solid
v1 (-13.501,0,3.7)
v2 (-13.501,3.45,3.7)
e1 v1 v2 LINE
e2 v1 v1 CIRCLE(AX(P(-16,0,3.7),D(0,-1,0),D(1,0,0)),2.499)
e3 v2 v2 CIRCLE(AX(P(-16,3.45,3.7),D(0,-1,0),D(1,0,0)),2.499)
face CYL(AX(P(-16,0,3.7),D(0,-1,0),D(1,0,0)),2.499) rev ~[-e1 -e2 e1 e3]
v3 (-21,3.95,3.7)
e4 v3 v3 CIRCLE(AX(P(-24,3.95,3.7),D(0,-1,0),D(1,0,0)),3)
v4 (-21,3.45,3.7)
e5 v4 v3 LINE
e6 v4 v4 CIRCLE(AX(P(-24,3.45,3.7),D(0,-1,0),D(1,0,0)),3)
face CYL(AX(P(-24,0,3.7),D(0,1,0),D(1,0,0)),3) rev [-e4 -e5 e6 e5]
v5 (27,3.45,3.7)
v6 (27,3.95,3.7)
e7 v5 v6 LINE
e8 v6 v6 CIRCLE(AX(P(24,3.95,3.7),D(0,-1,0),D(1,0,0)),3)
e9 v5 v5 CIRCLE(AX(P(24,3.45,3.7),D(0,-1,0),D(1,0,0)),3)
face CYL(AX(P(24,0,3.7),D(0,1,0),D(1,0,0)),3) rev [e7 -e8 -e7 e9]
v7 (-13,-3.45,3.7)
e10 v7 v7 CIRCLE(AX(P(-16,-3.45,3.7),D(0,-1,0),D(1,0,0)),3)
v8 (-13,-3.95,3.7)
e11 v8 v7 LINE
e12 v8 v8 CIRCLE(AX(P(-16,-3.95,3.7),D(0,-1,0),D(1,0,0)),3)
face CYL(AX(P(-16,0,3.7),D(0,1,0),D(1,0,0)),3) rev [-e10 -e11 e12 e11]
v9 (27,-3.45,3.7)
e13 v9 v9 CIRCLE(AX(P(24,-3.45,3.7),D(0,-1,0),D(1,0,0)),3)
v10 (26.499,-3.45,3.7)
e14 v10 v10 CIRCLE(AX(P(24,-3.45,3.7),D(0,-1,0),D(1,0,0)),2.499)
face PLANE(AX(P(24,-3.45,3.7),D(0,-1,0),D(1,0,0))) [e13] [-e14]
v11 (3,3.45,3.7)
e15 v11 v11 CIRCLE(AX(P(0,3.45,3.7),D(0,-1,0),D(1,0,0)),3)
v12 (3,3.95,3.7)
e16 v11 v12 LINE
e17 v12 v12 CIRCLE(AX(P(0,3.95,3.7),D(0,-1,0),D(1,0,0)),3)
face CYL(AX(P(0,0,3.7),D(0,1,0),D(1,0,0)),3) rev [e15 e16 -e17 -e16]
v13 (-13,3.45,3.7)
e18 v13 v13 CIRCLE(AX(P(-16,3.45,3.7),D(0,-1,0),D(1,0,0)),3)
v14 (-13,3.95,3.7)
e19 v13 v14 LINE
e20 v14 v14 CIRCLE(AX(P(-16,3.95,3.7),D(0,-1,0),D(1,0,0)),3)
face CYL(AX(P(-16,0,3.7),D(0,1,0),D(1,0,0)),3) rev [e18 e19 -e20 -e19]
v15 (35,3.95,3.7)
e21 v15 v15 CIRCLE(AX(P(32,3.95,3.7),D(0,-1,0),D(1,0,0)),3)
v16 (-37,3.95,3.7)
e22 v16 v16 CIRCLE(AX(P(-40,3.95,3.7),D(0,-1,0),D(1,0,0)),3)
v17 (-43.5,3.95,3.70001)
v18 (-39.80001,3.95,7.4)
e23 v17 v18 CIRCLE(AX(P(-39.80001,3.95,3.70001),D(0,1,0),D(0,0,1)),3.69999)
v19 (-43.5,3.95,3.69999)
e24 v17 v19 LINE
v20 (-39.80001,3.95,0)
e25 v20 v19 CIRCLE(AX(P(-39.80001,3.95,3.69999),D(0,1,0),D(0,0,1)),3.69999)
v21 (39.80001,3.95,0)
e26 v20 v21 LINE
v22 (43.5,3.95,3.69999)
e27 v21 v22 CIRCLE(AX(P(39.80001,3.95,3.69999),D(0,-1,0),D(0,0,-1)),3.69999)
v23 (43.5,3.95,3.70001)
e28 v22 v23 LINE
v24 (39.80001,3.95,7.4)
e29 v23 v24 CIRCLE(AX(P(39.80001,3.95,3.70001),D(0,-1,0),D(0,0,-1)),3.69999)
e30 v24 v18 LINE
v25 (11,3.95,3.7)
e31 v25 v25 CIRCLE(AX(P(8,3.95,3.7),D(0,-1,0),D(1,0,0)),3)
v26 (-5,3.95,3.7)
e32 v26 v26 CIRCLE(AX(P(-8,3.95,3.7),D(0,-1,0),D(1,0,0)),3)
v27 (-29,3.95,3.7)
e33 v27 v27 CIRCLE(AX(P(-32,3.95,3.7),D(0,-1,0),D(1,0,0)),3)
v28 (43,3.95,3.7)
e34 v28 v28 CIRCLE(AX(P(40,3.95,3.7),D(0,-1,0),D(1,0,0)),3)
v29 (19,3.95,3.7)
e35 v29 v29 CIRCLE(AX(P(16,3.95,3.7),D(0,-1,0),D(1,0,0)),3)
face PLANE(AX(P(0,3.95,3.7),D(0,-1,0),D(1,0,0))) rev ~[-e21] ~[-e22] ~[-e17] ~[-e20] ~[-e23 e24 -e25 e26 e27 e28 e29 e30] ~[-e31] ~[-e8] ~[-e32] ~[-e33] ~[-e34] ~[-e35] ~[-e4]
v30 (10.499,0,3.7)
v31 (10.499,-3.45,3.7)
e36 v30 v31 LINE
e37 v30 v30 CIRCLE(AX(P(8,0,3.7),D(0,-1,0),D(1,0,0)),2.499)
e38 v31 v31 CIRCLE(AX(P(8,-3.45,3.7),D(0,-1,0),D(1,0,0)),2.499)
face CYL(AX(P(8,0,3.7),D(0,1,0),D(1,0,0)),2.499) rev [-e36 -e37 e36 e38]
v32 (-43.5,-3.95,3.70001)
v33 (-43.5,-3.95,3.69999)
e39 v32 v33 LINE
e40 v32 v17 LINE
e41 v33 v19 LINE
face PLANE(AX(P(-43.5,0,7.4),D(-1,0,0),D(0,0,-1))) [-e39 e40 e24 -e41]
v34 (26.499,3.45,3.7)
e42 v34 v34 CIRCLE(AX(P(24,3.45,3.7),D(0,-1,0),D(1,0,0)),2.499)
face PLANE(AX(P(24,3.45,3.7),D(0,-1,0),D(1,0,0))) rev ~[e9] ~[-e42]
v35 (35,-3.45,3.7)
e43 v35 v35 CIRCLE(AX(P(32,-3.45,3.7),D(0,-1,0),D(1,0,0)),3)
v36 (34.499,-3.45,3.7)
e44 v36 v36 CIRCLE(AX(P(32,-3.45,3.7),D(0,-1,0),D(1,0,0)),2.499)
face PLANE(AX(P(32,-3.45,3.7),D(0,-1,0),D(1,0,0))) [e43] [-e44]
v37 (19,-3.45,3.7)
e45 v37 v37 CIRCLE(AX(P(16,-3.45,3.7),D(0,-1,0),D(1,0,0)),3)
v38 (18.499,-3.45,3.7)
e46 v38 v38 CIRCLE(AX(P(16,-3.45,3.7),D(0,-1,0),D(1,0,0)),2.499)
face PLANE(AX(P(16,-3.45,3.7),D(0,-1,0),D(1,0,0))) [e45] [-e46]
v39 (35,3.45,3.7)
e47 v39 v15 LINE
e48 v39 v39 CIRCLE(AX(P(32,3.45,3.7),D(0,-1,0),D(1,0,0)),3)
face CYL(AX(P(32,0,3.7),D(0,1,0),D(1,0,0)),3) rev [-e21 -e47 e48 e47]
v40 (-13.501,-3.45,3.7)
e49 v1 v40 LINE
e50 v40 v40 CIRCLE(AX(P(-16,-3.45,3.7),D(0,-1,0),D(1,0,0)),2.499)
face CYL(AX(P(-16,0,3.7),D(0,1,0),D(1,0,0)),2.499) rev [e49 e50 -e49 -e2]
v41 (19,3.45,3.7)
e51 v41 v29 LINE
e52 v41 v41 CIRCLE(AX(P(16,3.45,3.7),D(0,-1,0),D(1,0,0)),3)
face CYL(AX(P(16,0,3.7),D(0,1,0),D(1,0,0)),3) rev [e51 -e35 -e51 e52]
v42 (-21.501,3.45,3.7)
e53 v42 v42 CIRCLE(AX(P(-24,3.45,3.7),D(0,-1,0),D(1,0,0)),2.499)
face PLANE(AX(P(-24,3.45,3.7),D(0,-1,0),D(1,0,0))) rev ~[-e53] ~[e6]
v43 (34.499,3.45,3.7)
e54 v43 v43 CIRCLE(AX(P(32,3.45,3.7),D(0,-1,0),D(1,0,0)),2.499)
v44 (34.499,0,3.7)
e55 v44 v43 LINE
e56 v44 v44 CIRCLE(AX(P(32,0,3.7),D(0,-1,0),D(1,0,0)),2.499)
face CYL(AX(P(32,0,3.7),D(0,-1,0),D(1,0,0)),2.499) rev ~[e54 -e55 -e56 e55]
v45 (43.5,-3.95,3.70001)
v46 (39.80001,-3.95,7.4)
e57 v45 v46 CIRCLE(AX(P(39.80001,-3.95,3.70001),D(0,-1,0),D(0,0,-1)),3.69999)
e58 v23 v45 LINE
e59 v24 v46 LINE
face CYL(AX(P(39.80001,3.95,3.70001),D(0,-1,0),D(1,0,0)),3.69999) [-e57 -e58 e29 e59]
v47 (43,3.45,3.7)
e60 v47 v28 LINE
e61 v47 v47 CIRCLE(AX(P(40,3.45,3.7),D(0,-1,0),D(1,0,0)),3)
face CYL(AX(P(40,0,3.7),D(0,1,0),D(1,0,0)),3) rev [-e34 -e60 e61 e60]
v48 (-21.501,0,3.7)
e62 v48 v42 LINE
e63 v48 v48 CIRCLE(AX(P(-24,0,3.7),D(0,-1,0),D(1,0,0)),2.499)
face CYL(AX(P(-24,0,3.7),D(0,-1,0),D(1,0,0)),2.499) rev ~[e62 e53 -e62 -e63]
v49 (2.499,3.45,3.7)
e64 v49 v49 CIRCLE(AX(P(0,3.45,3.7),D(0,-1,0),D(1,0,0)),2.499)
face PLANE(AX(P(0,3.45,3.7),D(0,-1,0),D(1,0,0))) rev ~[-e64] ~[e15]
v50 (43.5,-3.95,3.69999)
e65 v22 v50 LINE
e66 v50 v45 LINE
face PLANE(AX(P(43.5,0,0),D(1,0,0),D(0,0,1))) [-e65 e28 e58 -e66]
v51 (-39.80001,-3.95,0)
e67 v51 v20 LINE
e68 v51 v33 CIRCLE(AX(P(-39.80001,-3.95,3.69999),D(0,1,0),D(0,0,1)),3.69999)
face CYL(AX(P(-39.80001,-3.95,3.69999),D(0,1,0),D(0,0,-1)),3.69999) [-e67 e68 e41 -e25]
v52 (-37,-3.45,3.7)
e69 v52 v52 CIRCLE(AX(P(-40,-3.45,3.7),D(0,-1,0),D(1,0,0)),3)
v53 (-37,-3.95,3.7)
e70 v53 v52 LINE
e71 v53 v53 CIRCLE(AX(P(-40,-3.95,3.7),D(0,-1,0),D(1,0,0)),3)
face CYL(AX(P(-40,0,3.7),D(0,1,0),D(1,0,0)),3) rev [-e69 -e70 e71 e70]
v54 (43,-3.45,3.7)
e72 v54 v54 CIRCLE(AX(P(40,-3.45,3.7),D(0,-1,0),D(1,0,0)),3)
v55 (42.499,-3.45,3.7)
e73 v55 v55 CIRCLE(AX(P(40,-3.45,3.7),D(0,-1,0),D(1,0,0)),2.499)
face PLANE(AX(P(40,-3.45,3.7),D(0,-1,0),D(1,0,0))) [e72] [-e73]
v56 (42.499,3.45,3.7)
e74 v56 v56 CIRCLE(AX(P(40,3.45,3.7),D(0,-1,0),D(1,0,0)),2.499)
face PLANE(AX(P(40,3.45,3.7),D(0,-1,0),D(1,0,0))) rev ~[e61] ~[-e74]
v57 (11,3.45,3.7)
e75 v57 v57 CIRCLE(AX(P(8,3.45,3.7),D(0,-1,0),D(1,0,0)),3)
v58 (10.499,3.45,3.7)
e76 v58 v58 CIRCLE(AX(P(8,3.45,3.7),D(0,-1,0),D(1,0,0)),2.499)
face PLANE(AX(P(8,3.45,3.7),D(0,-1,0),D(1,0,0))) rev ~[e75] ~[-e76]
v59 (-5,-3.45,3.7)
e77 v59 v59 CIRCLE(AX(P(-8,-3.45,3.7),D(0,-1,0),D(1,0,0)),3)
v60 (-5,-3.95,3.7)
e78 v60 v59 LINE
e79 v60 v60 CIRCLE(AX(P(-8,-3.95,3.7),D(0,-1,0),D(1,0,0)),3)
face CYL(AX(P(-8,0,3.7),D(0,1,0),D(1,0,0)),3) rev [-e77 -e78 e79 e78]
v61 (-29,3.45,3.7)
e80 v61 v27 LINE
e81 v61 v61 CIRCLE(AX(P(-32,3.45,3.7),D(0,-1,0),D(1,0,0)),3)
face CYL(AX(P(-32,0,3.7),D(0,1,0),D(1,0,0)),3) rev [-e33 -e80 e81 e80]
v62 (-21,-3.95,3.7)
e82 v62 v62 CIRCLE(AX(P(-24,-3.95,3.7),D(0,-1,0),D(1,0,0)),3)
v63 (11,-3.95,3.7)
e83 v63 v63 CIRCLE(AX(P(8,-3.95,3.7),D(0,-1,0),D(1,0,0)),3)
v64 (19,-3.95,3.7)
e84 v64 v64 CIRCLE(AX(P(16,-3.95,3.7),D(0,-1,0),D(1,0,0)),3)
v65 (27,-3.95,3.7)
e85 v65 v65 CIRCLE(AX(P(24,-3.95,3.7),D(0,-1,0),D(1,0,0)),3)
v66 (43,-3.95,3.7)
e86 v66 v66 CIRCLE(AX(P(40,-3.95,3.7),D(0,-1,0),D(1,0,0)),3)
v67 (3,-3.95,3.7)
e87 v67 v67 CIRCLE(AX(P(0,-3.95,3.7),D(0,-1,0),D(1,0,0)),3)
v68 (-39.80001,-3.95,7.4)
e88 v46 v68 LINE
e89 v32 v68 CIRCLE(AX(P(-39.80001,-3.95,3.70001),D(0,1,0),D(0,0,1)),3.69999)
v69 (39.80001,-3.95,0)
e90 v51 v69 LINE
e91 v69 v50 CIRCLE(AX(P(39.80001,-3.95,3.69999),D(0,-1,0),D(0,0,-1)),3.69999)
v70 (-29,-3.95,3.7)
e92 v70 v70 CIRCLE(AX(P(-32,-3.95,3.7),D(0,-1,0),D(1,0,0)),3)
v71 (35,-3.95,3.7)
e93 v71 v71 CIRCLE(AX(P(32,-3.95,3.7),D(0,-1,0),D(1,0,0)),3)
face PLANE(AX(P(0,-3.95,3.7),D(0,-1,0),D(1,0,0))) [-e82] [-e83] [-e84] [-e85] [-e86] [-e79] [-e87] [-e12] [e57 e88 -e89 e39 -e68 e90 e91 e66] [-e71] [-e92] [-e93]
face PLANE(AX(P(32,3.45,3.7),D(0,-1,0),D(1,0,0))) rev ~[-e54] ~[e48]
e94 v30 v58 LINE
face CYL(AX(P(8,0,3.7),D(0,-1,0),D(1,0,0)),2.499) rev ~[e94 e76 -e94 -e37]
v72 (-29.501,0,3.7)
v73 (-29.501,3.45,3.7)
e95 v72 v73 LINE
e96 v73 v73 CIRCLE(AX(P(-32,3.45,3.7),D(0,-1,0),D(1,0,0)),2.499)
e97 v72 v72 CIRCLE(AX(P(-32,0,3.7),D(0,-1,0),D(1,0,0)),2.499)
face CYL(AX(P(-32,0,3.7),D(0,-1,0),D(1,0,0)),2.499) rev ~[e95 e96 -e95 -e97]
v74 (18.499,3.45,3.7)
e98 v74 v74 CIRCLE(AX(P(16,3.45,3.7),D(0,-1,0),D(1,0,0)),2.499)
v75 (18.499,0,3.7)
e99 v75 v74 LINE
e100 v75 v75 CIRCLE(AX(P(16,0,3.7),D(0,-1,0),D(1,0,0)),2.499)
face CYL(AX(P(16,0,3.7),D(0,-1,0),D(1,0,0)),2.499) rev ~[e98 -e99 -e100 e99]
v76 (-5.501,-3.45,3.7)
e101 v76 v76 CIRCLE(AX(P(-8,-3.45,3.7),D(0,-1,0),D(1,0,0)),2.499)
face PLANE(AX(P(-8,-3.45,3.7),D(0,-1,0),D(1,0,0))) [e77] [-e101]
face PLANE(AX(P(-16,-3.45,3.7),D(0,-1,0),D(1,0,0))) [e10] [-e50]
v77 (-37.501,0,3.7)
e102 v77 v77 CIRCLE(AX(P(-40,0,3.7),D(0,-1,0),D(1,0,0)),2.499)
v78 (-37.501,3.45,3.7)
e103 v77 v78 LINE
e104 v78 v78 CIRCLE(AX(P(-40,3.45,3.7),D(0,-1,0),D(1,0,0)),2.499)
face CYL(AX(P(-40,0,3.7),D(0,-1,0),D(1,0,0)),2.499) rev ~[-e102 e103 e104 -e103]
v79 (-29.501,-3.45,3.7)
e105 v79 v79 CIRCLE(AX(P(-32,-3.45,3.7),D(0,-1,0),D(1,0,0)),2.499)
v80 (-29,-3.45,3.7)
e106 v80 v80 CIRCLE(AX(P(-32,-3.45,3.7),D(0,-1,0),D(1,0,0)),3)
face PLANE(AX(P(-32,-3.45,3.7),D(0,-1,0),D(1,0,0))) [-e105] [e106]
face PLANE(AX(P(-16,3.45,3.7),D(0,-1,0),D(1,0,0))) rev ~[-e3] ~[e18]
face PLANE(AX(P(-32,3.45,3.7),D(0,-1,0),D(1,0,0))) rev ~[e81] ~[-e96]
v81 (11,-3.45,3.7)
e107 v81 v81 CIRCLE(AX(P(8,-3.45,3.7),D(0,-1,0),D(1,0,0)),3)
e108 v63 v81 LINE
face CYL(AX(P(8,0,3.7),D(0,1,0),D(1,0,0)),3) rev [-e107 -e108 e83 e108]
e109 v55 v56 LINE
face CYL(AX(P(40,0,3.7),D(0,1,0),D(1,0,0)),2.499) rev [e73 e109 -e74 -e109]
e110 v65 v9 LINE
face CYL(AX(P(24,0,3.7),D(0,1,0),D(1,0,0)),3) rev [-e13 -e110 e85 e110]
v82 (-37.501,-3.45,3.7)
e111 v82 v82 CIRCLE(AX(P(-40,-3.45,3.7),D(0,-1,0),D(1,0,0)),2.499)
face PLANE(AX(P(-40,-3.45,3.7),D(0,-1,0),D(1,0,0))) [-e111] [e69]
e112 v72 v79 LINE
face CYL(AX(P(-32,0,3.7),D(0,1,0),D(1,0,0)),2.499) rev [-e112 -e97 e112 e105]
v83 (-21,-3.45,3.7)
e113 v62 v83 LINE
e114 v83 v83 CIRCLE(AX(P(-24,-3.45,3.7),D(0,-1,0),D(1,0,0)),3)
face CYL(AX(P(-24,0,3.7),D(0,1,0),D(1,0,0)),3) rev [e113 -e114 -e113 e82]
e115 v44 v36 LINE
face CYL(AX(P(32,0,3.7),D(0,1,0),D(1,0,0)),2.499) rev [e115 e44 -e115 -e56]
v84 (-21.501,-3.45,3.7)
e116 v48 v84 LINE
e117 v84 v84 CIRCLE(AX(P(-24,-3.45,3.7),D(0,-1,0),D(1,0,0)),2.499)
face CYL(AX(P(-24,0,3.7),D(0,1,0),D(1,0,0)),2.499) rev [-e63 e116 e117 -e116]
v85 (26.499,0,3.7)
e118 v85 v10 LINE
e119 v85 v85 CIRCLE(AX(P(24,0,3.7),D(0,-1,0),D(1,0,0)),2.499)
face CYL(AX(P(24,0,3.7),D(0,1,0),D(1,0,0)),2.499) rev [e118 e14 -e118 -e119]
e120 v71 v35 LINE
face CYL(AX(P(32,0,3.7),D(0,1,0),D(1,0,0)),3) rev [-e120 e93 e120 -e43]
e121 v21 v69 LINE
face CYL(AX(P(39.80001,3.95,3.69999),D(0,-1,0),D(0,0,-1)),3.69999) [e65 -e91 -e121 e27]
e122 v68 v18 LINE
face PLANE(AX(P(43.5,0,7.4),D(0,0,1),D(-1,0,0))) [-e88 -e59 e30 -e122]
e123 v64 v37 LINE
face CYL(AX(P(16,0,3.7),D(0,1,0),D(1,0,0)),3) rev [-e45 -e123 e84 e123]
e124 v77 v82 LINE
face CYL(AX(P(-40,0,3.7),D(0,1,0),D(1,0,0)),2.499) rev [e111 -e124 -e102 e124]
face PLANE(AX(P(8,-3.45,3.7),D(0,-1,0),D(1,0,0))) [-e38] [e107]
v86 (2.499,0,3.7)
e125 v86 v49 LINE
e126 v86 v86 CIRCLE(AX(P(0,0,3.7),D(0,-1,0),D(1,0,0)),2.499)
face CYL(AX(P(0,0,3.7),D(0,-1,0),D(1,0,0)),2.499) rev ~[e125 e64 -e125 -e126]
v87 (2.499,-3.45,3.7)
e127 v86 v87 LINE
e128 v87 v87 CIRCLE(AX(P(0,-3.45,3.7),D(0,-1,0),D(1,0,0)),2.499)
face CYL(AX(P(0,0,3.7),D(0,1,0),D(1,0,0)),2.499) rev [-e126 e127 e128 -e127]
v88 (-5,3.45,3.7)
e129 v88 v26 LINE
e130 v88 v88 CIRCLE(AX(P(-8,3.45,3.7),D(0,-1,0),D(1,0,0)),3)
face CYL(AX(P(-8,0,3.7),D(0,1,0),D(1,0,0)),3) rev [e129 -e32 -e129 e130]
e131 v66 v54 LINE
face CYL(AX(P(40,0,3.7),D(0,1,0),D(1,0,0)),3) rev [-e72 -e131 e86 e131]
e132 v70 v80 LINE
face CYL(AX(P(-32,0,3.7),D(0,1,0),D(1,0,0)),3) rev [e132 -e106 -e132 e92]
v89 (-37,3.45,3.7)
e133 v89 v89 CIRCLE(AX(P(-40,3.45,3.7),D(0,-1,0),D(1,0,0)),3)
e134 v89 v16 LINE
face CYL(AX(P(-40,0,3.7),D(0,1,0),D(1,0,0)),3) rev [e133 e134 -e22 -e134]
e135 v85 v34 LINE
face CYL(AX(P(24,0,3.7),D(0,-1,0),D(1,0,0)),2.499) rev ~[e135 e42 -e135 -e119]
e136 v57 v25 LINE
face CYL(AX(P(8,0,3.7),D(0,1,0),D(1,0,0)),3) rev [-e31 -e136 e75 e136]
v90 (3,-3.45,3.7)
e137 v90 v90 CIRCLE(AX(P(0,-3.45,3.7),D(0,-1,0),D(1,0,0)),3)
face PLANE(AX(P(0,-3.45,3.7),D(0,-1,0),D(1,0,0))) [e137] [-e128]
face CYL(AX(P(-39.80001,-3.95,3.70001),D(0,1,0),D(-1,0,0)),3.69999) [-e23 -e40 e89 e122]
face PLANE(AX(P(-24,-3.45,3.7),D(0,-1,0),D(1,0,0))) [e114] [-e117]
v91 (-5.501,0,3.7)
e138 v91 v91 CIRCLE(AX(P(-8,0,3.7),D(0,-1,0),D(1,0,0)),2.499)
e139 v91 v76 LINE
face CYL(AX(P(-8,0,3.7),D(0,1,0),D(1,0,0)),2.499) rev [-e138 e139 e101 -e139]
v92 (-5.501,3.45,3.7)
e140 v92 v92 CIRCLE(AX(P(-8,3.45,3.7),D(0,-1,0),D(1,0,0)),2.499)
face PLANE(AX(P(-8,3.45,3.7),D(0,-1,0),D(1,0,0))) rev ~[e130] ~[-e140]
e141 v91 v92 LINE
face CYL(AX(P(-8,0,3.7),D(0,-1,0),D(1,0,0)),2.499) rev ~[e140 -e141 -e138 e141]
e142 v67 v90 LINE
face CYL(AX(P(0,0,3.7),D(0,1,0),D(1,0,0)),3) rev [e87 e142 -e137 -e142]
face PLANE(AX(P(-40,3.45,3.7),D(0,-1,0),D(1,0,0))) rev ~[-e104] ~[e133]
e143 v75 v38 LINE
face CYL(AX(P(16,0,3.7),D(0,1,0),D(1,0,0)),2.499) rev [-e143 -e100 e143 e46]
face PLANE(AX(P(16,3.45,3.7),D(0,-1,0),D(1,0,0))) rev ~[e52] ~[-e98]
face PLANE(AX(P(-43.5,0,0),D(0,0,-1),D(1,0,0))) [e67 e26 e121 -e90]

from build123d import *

# Parameters (mm, degrees)
F0_R     = 3
F1_DEPTH = 3.95
F0_R_2   = 2.499
F2_DEPTH = 3.45
F3_R     = 3.69999
F4_R     = 3.69999


# Not quite as in the source:
# - a fillet or chamfer is up to 0.001 mm smaller than in the source, because OpenCascade refuses the exact size


with BuildPart() as f1:
    # F0 (on Front) → F1 (new body, symmetric)
    with BuildSketch(Plane.XZ):
        Polygon((-43.5, 0), (0, 0), (43.5, 0), (43.5, 7.4), (-43.5, 7.4), align=None)
        with Locations((-40, 3.7)):
            Circle(F0_R, mode=Mode.SUBTRACT)
        with Locations((-32, 3.7)):
            Circle(F0_R, mode=Mode.SUBTRACT)
        with Locations((-24, 3.7)):
            Circle(F0_R, mode=Mode.SUBTRACT)
        with Locations((-16, 3.7)):
            Circle(F0_R, mode=Mode.SUBTRACT)
        with Locations((-8, 3.7)):
            Circle(F0_R, mode=Mode.SUBTRACT)
        with Locations((0, 3.7)):
            Circle(F0_R, mode=Mode.SUBTRACT)
        with Locations((8, 3.7)):
            Circle(F0_R, mode=Mode.SUBTRACT)
        with Locations((16, 3.7)):
            Circle(F0_R, mode=Mode.SUBTRACT)
        with Locations((24, 3.7)):
            Circle(F0_R, mode=Mode.SUBTRACT)
        with Locations((32, 3.7)):
            Circle(F0_R, mode=Mode.SUBTRACT)
        with Locations((40, 3.7)):
            Circle(F0_R, mode=Mode.SUBTRACT)
    extrude(amount=F1_DEPTH, both=True)

    # F0 (on Front) → F2 (join, symmetric)
    with BuildSketch(Plane.XZ):
        with Locations((-40, 3.7)):
            Circle(F0_R)
        with Locations((-40, 3.7)):
            Circle(F0_R_2, mode=Mode.SUBTRACT)
        with Locations((-32, 3.7)):
            Circle(F0_R)
        with Locations((-32, 3.7)):
            Circle(F0_R_2, mode=Mode.SUBTRACT)
        with Locations((-24, 3.7)):
            Circle(F0_R)
        with Locations((-24, 3.7)):
            Circle(F0_R_2, mode=Mode.SUBTRACT)
        with Locations((-16, 3.7)):
            Circle(F0_R)
        with Locations((-16, 3.7)):
            Circle(F0_R_2, mode=Mode.SUBTRACT)
        with Locations((-8, 3.7)):
            Circle(F0_R)
        with Locations((-8, 3.7)):
            Circle(F0_R_2, mode=Mode.SUBTRACT)
        with Locations((0, 3.7)):
            Circle(F0_R)
        with Locations((0, 3.7)):
            Circle(F0_R_2, mode=Mode.SUBTRACT)
        with Locations((8, 3.7)):
            Circle(F0_R)
        with Locations((8, 3.7)):
            Circle(F0_R_2, mode=Mode.SUBTRACT)
        with Locations((16, 3.7)):
            Circle(F0_R)
        with Locations((16, 3.7)):
            Circle(F0_R_2, mode=Mode.SUBTRACT)
        with Locations((24, 3.7)):
            Circle(F0_R)
        with Locations((24, 3.7)):
            Circle(F0_R_2, mode=Mode.SUBTRACT)
        with Locations((32, 3.7)):
            Circle(F0_R)
        with Locations((32, 3.7)):
            Circle(F0_R_2, mode=Mode.SUBTRACT)
        with Locations((40, 3.7)):
            Circle(F0_R)
        with Locations((40, 3.7)):
            Circle(F0_R_2, mode=Mode.SUBTRACT)
    extrude(amount=F2_DEPTH, both=True)

    # F3 (radius 3.7 in the source; OpenCascade refuses exactly that, so slightly less here)
    f3_edges = [f1.edges().sort_by_distance(p)[0] for p in [
        (-43.5, 0, 7.4),
        (-43.5, 0, 0),
    ]]
    fillet(f3_edges, radius=F3_R)

    # F4 (radius 3.7 in the source; OpenCascade refuses exactly that, so slightly less here)
    f4_edges = [f1.edges().sort_by_distance(p)[0] for p in [
        (43.5, 0, 7.4),
        (43.5, 0, 0),
    ]]
    fillet(f4_edges, radius=F4_R)


solid = f1.part
